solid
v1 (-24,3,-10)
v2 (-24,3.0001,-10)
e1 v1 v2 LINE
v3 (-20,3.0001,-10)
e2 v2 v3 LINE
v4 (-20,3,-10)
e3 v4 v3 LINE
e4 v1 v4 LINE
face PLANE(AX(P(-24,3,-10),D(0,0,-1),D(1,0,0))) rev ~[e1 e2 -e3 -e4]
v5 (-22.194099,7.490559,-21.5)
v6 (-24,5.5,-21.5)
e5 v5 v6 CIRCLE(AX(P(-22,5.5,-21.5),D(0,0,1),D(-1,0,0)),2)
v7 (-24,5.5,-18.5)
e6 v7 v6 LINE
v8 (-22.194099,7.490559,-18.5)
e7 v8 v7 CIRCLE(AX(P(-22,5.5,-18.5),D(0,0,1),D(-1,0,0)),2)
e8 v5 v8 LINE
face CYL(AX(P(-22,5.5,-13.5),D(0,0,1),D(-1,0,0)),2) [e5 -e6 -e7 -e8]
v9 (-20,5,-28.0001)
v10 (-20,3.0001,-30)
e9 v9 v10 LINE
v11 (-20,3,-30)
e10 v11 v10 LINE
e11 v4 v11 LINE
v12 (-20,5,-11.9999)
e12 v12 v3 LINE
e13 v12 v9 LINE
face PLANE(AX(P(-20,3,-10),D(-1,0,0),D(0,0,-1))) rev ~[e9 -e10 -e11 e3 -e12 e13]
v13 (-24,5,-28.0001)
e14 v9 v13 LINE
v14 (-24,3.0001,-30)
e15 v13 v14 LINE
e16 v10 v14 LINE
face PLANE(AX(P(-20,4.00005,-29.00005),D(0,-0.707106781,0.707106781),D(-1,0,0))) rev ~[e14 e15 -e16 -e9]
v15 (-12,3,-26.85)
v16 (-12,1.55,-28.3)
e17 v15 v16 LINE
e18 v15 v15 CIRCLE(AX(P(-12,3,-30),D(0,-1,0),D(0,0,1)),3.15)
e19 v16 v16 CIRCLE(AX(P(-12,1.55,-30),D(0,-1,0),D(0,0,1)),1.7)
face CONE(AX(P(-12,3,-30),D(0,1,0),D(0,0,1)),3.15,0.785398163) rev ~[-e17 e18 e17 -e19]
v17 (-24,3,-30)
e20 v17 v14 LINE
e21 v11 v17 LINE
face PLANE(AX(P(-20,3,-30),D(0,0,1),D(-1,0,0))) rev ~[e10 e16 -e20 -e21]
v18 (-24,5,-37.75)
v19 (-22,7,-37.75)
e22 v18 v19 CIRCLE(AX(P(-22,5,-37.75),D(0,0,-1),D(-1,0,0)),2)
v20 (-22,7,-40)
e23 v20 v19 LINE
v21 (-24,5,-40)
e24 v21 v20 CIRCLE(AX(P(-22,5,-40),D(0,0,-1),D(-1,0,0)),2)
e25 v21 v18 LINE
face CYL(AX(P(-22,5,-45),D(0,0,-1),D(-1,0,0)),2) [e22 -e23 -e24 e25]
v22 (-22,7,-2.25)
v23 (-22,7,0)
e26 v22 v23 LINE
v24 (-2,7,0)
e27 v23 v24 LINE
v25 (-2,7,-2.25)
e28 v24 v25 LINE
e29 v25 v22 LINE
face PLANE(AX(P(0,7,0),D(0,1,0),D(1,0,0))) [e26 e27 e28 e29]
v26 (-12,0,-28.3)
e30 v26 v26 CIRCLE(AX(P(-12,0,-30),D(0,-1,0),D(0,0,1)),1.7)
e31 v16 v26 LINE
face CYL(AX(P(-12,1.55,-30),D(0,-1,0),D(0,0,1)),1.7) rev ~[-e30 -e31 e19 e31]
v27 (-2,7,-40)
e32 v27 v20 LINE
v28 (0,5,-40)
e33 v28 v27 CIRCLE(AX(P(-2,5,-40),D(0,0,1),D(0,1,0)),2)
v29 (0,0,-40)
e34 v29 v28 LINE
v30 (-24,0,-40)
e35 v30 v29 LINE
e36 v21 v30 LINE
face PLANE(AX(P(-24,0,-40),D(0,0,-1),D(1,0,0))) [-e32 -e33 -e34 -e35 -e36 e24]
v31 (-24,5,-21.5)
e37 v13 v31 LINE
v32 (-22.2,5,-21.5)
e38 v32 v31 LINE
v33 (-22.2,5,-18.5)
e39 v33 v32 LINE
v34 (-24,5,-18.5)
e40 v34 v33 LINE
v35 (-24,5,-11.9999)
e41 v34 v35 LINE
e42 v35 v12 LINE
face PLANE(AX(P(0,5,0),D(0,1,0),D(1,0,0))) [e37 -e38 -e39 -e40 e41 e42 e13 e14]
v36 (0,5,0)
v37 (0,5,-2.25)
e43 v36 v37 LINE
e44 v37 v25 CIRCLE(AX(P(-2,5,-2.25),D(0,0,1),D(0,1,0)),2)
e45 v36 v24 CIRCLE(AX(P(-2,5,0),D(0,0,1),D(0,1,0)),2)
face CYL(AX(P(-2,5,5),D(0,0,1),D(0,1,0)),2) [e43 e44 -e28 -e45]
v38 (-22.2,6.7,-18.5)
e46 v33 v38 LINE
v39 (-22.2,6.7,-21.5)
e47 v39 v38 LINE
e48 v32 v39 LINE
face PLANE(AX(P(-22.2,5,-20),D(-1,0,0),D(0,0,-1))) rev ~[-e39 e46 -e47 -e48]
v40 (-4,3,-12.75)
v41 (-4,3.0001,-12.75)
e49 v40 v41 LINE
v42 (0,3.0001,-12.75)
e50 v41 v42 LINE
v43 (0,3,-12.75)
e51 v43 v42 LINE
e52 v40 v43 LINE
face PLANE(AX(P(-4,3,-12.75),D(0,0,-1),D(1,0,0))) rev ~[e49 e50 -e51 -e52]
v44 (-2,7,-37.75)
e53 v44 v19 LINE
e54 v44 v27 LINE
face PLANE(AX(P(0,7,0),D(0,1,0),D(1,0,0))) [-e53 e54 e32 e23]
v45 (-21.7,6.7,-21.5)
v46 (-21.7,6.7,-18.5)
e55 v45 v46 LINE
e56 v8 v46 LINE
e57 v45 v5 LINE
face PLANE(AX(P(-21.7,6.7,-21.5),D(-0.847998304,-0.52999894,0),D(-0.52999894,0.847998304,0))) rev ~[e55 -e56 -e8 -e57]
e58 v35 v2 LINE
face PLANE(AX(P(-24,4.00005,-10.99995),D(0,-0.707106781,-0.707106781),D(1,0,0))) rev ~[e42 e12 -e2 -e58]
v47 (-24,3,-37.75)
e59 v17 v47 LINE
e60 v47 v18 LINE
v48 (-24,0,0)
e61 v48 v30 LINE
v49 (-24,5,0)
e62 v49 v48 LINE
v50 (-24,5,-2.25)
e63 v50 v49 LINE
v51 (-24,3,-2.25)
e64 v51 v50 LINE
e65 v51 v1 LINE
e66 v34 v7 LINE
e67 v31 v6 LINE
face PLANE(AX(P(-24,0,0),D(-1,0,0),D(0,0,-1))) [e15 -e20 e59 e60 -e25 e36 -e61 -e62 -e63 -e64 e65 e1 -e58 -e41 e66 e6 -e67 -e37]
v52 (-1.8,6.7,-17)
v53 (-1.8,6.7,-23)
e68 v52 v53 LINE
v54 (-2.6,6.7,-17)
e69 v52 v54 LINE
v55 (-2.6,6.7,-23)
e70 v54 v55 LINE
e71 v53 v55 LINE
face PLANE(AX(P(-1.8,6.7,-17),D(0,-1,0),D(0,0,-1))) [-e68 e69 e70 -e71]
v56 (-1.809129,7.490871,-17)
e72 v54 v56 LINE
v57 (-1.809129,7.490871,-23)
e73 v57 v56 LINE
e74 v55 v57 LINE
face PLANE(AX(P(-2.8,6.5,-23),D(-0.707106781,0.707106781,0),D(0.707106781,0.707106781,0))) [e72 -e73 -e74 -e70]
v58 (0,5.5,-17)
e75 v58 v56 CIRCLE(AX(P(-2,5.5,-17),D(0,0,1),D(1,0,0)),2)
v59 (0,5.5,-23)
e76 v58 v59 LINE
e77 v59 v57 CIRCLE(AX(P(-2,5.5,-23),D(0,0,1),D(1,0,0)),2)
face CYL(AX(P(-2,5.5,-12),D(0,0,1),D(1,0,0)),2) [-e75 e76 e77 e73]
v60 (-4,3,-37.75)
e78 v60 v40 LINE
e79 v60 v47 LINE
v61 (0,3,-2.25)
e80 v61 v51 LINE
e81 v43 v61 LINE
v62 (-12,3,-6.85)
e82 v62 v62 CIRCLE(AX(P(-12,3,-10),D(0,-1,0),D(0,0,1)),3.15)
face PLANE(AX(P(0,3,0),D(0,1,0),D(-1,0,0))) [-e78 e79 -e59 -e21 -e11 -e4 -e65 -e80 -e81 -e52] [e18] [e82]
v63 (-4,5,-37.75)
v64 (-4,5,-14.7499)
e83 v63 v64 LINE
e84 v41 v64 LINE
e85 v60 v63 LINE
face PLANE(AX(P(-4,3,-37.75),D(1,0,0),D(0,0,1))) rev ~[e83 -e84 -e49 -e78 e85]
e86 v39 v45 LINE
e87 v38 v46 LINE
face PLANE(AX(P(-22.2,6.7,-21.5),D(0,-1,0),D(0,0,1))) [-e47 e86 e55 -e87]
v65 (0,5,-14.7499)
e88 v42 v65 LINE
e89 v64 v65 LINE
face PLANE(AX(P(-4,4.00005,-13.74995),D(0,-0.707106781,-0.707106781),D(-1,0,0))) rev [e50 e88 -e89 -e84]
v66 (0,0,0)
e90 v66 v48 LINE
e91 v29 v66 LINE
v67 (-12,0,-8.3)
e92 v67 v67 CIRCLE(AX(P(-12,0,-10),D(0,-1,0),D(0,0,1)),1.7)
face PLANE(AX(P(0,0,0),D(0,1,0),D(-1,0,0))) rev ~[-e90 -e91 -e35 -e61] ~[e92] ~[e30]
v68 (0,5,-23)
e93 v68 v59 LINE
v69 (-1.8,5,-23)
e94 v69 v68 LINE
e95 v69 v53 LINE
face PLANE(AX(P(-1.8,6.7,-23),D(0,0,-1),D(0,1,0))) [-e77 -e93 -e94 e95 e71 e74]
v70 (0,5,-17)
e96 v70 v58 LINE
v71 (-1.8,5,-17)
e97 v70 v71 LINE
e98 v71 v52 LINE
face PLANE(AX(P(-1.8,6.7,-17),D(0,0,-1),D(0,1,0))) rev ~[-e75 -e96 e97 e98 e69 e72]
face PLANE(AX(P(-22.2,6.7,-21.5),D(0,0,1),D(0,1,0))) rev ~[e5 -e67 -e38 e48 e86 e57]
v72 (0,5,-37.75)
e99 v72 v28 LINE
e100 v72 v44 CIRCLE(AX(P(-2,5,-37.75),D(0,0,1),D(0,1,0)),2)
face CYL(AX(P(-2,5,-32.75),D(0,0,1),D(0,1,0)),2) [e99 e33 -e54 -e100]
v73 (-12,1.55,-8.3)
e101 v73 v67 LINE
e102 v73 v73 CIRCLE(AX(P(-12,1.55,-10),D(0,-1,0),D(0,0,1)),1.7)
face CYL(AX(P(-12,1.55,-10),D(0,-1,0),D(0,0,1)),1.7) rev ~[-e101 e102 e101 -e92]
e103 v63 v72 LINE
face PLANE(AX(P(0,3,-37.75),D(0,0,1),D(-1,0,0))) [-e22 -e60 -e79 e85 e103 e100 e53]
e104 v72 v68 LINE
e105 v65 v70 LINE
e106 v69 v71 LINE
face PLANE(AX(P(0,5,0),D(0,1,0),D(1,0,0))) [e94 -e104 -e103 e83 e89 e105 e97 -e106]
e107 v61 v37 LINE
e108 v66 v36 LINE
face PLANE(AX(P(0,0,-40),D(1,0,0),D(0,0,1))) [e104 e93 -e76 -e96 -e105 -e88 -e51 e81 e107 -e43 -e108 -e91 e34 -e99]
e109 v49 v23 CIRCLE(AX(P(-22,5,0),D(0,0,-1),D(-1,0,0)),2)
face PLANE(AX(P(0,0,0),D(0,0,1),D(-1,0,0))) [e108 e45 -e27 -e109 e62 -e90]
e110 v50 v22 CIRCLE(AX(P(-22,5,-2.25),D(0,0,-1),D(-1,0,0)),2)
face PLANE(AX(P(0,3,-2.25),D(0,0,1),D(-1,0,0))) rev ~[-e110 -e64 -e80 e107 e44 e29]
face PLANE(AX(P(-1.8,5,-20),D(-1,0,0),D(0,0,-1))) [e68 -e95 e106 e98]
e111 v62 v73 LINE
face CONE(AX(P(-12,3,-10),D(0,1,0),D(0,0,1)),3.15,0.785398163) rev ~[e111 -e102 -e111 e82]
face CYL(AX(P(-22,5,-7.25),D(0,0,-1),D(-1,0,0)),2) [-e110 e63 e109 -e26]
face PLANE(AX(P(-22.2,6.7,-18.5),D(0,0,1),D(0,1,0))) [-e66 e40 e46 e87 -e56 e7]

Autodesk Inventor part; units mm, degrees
ref_plane "YZ Plane" through (0, 0, 0) normal (1, 0, 0) x (0, 1, 0)
ref_plane "XZ Plane" through (0, 0, 0) normal (0, 1, 0) x (-1, 0, 0)
ref_plane "XY Plane" through (0, 0, 0) normal (0, 0, 1) x (1, 0, 0)
sketch "Skizze1" plane through (0, 0, 0) normal (0, 1, 0) x (-1, 0, 0)
  line L0 (0, 0) -> (24, 0)
  line L1 (24, 0) -> (24, -40)
  line L2 (24, -40) -> (0, -40)
  line L3 (0, -40) -> (0, 0)
  dimension "d0" = 40
  dimension "d1" = 24
extrude "Extrusion1" add sketch "Skizze1" along normal blind 3
sketch "Skizze2" plane through (0, 3, 0) normal (0, 1, 0) x (1, 0, 0)
  line L0 (-24, 40) -> (-24, 0) projected
  line L1 (0, 0) -> (0, 40) projected
  line L2 (-24, 0) -> (0, 0)
  line L3 (0, 0) -> (0, 2.25)
  line L4 (0, 2.25) -> (-24, 2.25)
  line L5 (-24, 2.25) -> (-24, 0)
  line L6 (0, 40) -> (-24, 40) projected
  line L7 (-24, 40) -> (0, 40)
  line L8 (0, 40) -> (0, 37.75)
  line L9 (0, 37.75) -> (-24, 37.75)
  line L10 (-24, 37.75) -> (-24, 40)
  dimension "d4" = 2.25
  dimension "d5" = 2.25
extrude "Extrusion2" add sketch "Skizze2" along normal blind 4 contours L6 L1 L9 L0 | L4 L1 L2 L0
sketch "Skizze4" plane through (0, 3, 0) normal (0, 1, 0) x (1, 0, 0)
  line L0 (0, 2.25) -> (-24, 2.25) projected
  line L1 (0, 2.25) -> (-1.8184, 2.25)
  line L2 (0, 37.75) -> (-1.8184, 37.75)
  line L3 (-24.0183, 2.25) -> (-21.7244, 2.25)
  line L4 (-24, 37.75) -> (-21.1801, 37.75)
  line L5 (0, 37.75) -> (-4, 37.75)
  line L6 (-4, 37.75) -> (-4, 12.75)
  line L7 (-4, 12.75) -> (0, 12.75)
  line L8 (0, 12.75) -> (0, 37.75)
  line L9 (-24, 37.75) -> (-24, 2.25) projected
  line L10 (-24, 10) -> (-20, 10)
  line L11 (-20, 10) -> (-20, 30)
  line L12 (-20, 30) -> (-24, 30)
  line L13 (-24, 30) -> (-24, 10)
  line L14 (-24, 0) -> (0, 0) projected
  dimension "d25" = 25
  dimension "d26" = 4
  dimension "d27" = 4
  dimension "d29" = 20
  dimension "d30" = 10
extrude "Extrusion4" add sketch "Skizze4" along normal blind 2
sketch "Skizze5" plane through (0, 5, 0) normal (0, 1, 0) x (1, 0, 0)
  line L0 (-24, 30) -> (-24, 10) projected
  line L1 (-24, 20) -> (0, 20)
  line L2 (0, 0) -> (0, 40) projected
  line L3 (-24, 18.5) -> (-22.2, 18.5)
  line L4 (-22.2, 18.5) -> (-22.2, 21.5)
  line L5 (-22.2, 21.5) -> (-24, 21.5)
  line L6 (-24, 21.5) -> (-24, 18.5)
  line L7 (0, 17) -> (-1.8, 17)
  line L8 (-1.8, 17) -> (-1.8, 23)
  line L9 (-1.8, 23) -> (0, 23)
  line L10 (0, 23) -> (0, 17)
  point P0 (-23.1, 18.5)
  point P1 (0, 23)
  dimension "d33" = 3
  dimension "d34" = 1.8
  dimension "d35" = 1.8
  dimension "d36" = 6
extrude "Extrusion5" add sketch "Skizze5" along normal blind 2.5
sketch "Skizze6" plane through (-1.8, 5, -23) normal (-1, 0, 0) x (0, 0, 1)
  line L0 (0, 0) -> (0, 2.5) projected
  line L1 (6, 0) -> (6, 2.5) projected
  line L2 (0, 2.5) -> (6, 2.5)
  line L3 (6, 2.5) -> (6, 1.7)
  line L4 (6, 1.7) -> (0, 1.7)
  line L5 (0, 1.7) -> (0, 2.5)
  point P0 (23, -5)
  point P1 (0, 1.7)
  dimension "d39" = 0.8
extrude "Extrusion6" add sketch "Skizze6" along normal blind 1
sketch "Skizze7" plane through (0, 5, -23) normal (0, 0, -1) x (-1, 0, 0)
  line L0 (2.8, 2.5) -> (2.8, 1.7) projected
  line L1 (2.8, 1.5) -> (1.8, 2.5)
  line L2 (0, 2.5) -> (2.8, 2.5) projected
  line L3 (1.8, 2.5) -> (2.8, 2.5)
  line L4 (2.8, 2.5) -> (2.8, 1.5)
  point P0 (0, -5)
  dimension "d42" = 1
  dimension "d43" = 1
extrude "Extrusion7" cut sketch "Skizze7" against normal blind 10
sketch "Skizze9" plane through (-22.2, 5, -18.5) normal (1, 0, 0) x (0, 0, -1)
  line L0 (0, 0) -> (0, 2.5) projected
  line L1 (3, 0) -> (3, 2.5) projected
  line L2 (0, 2.5) -> (3, 2.5)
  line L3 (3, 2.5) -> (3, 1.7)
  line L4 (3, 1.7) -> (0, 1.7)
  line L5 (0, 1.7) -> (0, 2.5)
  line L6 (3, 0) -> (0, 0) projected
  point P0 (-18.5, -5)
  point P1 (0, 1.7)
  dimension "d46" = 1.7
extrude "Extrusion8" add sketch "Skizze9" along normal blind 0.5 contours L0 L2 L1 L4
sketch "Skizze11" plane through (-22.2, 5, -21.5) normal (0, 0, -1) x (-1, 0, 0)
  line L0 (-0.5, 2.5) -> (-0.5, 1.7)
  line L1 (-0.5, 1.7) -> (0, 2.5)
  line L2 (1.8, 2.5) -> (-0.5, 2.5) projected
  line L3 (-0.5, 1.7) -> (-0.5, 2.5) projected
  line L4 (-0.5, 2.5) -> (0, 2.5)
  point P0 (-22.2, -5)
  dimension "d49" = 0.5
extrude "Extrusion9" cut sketch "Skizze11" against normal blind 10
chamfer "Fasen1" distance 2 angle 45 3 edges at (-22, 5, -30) (-22, 5, -10) (-2, 5, -12.75)
fillet "Rundung1" radius 2 6 edges at (0, 7.5, -20) (-24, 7.5, -20) (-24, 7, -1.125) (0, 7, -1.125) (-24, 7, -38.875) (0, 7, -38.875)
sketch "Skizze12" plane through (0, 3, 0) normal (0, 1, 0) x (1, 0, 0)
  line L0 (-24, 0) -> (0, 0) projected
  line L1 (-12, 0) -> (-12, 40)
  line L2 (0, 40) -> (-24, 40) projected
  circle A0 centre (-12, 10) radius 2
  circle A1 centre (-12, 30) radius 2
  line L3 (-24, 40) -> (-24, 0) projected
  line L4 (-24, 20) -> (0, 20) construction
  line L5 (0, 17) -> (0, 23) projected
  dimension "d56" = 4
  dimension "d57" = 4
  dimension "d58" = 20
hole "Bohrung1" at (-12, 3, -10) at (-12, 3, -30) direction (0, -1, 0) diameter 3.4 depth 8.8 tip angle 118 countersink diameter 6.3 countersink angle 90 clearance for "Flachkopfsenkschraube ISO 2009/7046" size "M3" standard "ISO"
properties part number "Halter_Treiber_LED_2"
